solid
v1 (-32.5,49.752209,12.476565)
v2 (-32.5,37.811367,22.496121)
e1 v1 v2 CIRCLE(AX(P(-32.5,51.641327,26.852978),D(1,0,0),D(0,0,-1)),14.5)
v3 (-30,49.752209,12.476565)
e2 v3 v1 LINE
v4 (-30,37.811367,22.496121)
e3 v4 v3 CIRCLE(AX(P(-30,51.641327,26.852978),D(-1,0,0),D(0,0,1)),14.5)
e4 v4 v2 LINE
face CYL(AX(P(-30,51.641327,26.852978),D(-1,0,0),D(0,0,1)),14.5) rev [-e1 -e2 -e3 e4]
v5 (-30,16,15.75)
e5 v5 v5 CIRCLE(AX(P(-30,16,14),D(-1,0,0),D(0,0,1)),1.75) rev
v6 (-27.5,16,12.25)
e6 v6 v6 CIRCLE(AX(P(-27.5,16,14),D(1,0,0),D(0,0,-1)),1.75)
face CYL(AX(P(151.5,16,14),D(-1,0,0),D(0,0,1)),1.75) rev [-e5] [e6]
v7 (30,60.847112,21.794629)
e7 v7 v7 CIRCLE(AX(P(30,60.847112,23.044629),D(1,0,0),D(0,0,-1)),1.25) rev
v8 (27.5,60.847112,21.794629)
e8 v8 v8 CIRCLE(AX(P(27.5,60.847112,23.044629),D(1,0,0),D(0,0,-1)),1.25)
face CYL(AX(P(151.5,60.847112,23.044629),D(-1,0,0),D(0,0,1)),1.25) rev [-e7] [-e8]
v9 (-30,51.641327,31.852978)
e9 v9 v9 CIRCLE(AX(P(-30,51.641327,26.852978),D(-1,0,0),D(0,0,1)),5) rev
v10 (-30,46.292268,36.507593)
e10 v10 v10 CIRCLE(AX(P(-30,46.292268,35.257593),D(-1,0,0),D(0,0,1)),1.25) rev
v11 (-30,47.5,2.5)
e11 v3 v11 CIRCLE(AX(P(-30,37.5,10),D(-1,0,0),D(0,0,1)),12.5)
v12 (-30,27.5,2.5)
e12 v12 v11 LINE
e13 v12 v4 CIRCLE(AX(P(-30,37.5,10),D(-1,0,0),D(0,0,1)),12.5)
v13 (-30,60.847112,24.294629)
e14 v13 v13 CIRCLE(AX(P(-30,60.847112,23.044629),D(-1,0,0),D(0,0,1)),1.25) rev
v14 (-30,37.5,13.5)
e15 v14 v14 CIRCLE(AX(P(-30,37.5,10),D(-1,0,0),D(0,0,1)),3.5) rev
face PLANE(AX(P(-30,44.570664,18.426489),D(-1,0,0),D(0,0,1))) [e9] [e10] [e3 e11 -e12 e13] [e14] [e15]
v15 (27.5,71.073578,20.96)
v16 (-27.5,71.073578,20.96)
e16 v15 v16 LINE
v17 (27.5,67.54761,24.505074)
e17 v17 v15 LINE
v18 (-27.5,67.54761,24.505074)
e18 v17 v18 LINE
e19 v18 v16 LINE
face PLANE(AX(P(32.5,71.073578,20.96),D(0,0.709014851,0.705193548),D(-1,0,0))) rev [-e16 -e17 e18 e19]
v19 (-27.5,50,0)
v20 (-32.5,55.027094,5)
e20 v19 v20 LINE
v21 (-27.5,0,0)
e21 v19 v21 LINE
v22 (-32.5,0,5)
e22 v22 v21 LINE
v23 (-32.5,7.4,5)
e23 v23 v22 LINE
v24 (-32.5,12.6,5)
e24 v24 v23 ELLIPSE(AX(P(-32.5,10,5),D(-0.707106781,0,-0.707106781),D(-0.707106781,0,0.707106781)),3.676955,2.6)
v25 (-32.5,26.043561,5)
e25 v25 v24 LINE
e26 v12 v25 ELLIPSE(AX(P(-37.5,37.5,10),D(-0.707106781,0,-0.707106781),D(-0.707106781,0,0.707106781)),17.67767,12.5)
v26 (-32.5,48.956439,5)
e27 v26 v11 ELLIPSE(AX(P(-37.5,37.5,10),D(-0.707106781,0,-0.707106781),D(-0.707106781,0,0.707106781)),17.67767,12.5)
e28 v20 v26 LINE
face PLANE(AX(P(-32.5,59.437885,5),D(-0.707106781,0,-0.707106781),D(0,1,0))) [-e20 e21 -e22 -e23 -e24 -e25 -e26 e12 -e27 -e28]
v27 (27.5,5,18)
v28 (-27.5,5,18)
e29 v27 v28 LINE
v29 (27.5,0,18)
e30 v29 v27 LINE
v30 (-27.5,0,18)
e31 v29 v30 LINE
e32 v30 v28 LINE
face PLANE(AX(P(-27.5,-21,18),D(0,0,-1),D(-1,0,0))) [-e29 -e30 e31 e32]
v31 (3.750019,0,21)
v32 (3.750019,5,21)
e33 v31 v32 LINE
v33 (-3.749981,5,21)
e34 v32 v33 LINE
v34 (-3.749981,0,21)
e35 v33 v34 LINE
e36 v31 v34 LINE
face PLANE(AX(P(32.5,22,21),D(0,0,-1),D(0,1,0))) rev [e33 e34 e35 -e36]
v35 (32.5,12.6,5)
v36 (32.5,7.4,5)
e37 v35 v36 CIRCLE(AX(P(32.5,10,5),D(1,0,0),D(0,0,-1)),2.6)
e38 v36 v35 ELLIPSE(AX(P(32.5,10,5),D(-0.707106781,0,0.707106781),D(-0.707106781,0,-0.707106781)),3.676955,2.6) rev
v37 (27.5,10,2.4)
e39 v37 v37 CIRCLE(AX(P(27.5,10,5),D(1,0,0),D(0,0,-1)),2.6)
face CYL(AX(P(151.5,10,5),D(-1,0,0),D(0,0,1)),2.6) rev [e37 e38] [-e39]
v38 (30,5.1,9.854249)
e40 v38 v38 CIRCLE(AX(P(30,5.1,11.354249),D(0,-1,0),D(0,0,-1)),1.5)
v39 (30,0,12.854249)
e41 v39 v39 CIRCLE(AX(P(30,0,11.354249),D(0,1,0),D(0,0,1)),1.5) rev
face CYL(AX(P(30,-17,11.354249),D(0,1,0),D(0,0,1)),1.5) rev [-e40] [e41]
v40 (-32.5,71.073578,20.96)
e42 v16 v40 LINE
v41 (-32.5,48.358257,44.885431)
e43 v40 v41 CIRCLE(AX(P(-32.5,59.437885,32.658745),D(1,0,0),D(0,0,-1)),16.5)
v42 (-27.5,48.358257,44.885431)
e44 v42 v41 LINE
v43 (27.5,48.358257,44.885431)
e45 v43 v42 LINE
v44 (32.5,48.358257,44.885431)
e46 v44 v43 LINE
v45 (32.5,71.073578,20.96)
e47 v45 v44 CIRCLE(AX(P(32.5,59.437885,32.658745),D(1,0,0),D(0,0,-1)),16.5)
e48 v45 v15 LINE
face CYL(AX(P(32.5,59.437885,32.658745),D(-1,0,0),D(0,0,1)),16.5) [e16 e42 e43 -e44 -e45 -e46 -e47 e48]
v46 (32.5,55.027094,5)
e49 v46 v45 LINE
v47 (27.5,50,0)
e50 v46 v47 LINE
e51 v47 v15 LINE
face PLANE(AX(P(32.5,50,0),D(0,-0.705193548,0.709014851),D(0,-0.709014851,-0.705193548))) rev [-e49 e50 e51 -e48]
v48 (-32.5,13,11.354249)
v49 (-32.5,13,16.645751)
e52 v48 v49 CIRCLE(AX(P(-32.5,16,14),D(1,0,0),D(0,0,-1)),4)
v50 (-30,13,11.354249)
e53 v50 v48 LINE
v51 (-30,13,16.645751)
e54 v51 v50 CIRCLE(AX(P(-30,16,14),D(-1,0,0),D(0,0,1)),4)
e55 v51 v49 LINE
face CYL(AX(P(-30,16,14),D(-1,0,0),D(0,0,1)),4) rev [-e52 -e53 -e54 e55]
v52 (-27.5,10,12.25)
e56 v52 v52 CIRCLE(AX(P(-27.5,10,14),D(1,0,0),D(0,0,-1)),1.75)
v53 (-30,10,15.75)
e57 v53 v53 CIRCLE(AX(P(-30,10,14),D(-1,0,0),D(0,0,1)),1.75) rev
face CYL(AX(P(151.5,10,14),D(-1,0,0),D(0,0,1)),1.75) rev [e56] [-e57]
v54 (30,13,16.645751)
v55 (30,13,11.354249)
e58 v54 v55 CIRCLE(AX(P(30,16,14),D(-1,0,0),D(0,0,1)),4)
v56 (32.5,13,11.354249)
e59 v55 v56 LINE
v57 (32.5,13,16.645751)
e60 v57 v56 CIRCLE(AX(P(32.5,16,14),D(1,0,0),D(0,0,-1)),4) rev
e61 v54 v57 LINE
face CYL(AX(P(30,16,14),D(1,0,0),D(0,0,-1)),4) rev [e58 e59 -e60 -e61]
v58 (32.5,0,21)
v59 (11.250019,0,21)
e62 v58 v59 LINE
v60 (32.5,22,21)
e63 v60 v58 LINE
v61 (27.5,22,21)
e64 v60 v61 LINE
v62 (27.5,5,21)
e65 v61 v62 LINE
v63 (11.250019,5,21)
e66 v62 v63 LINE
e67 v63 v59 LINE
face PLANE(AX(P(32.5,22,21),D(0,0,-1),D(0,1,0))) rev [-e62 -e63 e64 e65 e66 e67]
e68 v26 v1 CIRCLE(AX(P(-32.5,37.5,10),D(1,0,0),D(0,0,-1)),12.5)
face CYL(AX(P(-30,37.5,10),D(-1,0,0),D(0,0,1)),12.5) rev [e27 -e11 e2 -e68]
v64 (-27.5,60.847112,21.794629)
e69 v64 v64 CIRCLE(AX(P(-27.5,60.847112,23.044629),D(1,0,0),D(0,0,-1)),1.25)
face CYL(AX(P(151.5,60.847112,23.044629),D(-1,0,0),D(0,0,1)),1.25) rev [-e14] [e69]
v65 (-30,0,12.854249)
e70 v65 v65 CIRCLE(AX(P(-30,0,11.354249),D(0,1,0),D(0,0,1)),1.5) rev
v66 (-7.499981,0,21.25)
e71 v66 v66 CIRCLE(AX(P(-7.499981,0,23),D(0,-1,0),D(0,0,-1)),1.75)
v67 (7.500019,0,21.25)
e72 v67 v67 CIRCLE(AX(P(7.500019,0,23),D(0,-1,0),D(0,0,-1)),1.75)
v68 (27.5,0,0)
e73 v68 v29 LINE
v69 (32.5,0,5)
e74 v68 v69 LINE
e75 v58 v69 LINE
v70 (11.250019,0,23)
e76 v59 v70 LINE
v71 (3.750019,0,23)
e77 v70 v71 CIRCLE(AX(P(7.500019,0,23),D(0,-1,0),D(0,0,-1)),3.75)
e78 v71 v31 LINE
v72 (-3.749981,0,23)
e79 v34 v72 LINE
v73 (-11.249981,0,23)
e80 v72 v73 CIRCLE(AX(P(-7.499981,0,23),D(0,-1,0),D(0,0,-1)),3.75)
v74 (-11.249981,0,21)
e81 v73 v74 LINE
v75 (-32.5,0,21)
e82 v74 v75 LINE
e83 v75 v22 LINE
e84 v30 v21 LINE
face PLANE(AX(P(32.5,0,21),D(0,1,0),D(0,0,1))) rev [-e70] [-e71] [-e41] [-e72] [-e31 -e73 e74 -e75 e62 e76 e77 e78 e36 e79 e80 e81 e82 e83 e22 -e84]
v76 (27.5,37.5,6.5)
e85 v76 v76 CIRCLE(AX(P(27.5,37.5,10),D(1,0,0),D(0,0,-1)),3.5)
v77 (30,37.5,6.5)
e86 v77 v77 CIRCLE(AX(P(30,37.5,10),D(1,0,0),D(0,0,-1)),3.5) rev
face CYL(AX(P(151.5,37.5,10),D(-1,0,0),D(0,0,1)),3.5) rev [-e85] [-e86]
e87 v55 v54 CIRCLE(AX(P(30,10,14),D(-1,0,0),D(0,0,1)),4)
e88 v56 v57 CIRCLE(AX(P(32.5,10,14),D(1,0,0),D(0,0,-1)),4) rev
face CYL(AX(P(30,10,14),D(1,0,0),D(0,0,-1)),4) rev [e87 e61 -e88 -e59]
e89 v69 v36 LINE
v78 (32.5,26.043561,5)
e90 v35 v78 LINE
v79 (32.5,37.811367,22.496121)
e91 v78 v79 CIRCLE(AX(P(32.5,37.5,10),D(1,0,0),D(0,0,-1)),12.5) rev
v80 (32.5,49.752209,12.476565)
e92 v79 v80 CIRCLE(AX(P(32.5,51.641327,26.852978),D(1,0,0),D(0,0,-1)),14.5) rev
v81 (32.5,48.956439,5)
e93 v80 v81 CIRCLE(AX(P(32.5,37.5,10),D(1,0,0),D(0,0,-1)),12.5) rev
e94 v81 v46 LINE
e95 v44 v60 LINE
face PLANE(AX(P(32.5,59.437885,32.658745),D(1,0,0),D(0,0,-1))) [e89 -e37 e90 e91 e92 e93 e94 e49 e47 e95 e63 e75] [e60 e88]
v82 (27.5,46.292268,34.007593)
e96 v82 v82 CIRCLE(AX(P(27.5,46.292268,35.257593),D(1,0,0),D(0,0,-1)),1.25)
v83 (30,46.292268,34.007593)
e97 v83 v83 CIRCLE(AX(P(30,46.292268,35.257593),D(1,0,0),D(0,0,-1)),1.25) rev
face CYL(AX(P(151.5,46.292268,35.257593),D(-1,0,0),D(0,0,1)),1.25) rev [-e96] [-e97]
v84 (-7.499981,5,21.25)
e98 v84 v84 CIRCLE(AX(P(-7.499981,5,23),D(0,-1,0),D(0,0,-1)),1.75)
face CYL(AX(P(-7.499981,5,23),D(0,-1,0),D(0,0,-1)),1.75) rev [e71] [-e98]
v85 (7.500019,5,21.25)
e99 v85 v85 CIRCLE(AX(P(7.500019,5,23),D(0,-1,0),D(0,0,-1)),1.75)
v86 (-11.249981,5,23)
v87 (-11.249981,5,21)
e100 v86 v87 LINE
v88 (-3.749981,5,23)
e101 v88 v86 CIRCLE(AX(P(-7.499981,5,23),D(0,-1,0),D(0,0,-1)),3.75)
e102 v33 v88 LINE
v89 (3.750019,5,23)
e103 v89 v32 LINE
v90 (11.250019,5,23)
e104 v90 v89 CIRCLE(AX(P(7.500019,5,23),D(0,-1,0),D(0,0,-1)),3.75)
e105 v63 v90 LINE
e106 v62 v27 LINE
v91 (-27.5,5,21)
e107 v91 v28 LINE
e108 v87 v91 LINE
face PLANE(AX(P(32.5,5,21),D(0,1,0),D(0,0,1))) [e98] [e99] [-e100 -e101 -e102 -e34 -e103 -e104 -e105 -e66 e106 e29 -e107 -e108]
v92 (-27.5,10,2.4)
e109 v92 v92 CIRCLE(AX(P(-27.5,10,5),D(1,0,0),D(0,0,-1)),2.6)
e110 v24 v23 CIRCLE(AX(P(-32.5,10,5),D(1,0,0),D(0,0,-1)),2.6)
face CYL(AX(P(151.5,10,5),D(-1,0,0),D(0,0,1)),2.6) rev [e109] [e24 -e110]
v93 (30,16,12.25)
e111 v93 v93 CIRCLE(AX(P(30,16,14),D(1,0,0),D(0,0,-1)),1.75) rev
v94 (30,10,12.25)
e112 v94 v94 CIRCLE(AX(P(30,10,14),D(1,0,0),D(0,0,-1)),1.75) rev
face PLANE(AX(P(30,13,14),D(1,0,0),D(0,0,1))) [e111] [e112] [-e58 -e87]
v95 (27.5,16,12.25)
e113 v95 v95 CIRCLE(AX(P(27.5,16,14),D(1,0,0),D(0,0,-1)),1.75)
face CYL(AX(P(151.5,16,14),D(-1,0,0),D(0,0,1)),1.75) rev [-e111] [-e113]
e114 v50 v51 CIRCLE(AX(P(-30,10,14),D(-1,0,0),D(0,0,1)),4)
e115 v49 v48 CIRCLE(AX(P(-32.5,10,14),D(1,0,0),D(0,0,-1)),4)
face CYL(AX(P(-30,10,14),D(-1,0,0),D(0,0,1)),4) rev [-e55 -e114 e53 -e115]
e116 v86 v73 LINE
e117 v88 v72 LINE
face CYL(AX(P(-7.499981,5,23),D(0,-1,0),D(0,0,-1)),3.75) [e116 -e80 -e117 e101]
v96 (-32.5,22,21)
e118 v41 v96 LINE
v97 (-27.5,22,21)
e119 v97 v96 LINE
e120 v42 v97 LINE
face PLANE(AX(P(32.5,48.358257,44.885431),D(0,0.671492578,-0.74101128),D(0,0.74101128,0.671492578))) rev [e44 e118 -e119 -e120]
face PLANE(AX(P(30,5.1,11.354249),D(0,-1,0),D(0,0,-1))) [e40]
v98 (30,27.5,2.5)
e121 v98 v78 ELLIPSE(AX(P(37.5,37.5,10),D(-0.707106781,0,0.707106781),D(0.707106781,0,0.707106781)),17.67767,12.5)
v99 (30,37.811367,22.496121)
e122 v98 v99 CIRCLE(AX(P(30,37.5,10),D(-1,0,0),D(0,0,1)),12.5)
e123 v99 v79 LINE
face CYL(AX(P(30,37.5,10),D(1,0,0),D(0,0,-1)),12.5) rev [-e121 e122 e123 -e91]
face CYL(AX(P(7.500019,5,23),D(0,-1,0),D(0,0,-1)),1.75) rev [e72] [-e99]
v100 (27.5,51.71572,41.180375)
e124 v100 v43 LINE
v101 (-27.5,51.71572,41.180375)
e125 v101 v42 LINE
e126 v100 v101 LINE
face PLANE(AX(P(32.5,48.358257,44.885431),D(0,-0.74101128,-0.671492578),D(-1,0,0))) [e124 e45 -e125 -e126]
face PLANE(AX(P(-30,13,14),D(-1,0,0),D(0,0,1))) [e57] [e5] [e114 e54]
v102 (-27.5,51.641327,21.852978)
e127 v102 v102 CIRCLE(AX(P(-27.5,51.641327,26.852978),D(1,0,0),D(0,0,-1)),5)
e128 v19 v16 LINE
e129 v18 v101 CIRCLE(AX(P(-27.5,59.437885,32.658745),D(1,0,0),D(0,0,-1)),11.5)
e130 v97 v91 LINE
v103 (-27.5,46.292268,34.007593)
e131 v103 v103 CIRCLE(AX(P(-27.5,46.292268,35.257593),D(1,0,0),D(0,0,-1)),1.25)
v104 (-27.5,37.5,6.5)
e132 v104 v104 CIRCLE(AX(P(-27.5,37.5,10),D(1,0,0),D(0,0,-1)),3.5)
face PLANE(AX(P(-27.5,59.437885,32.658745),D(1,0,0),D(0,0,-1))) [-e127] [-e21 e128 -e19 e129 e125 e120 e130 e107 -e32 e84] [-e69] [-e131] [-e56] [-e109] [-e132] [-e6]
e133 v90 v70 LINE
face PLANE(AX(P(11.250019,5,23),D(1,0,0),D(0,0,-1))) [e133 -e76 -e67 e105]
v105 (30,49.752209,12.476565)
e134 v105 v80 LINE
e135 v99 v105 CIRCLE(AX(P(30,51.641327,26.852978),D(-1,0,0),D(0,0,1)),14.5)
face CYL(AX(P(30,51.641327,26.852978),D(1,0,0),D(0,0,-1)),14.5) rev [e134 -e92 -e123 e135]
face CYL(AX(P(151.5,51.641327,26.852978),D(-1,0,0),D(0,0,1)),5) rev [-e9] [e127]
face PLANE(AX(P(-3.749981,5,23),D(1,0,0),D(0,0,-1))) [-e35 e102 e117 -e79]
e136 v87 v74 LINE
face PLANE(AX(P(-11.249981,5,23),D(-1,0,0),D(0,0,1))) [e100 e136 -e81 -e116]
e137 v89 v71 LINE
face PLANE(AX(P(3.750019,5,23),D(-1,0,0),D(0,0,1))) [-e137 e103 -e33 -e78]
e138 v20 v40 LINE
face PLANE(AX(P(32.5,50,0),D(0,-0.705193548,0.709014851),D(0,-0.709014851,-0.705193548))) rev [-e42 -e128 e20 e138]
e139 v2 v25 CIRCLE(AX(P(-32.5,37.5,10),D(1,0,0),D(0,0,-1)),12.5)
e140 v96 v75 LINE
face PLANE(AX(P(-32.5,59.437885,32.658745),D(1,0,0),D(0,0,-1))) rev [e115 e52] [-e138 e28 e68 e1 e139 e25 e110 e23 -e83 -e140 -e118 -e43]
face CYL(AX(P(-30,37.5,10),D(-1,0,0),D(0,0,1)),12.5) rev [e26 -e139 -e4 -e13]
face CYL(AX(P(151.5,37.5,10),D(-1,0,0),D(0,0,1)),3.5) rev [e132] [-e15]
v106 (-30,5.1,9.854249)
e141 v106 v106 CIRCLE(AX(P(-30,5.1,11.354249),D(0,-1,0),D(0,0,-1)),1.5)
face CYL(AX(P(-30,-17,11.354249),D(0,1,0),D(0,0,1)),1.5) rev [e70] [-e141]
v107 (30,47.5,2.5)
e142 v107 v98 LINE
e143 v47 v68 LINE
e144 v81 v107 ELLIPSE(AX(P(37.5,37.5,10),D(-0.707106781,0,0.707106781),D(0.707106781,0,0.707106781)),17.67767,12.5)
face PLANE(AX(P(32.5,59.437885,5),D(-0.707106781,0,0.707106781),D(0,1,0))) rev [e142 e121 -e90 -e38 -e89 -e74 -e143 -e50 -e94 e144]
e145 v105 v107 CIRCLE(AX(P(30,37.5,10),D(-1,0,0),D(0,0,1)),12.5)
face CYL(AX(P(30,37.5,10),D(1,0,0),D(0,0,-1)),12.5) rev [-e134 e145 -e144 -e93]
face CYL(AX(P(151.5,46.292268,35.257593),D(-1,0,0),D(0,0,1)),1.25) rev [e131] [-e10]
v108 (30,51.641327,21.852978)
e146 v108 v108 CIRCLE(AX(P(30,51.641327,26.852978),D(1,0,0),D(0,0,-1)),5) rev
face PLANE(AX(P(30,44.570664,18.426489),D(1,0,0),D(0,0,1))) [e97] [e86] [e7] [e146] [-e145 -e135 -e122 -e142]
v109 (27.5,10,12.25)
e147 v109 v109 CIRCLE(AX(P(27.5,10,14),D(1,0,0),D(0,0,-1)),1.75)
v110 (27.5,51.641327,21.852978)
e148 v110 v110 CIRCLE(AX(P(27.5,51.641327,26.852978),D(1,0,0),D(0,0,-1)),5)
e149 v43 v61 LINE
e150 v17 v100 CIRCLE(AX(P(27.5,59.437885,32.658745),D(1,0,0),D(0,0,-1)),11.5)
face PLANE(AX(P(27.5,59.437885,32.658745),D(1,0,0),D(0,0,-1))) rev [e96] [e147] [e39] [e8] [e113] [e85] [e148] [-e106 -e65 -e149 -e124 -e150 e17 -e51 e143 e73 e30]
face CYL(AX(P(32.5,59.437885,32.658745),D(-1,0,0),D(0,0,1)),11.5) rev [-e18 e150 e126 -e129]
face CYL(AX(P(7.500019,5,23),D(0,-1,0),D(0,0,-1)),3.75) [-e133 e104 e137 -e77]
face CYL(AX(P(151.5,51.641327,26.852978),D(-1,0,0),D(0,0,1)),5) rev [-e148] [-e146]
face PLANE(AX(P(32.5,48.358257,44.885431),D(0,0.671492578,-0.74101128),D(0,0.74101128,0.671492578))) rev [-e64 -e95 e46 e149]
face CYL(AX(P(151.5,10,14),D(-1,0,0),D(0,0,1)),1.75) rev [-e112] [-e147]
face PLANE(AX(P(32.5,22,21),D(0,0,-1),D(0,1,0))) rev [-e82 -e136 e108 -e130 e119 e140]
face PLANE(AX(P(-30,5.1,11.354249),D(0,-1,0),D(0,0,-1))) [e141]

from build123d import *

# Parameters (mm, degrees)
BOSS_EXTRUDE1_DEPTH     = 32.5
SHELL4_START            = -27.5
SHELL4_DEPTH            = 55
CUT_EXTRUDE2_DEPTH      = 21
CUT_EXTRUDE2_DEPTH_BACK = 20
SKETCH4_W               = 55
SKETCH4_H               = 18
CHAMFER18_START         = -24
CHAMFER18_OUTLINE_W     = 10
CHAMFER18_OUTLINE_H     = 57
CHAMFER18_DEPTH         = 4.554563517
CHAMFER36_START         = 19.445436483
CHAMFER36_OUTLINE_W     = 10
CHAMFER36_OUTLINE_H     = 57
CHAMFER36_DEPTH         = 4.554563517
SKETCH8_R               = 2.6
SKETCH8_R_2             = 1.75
SKETCH8_R_3             = 5
SKETCH8_R_4             = 3.5
SKETCH8_R_5             = 1.25
CUT_EXTRUDE4_DEPTH      = 185
CUT_EXTRUDE6_DEPTH      = 4.5
CUT_EXTRUDE8_DEPTH      = 17
CUT_EXTRUDE8_DEPTH_BACK = 5.1
SKETCH13_R              = 1.5
SKETCH14_R              = 1.75
BOSS_EXTRUDE2_DEPTH     = 5


with BuildPart() as part:
    # Sketch3 → Boss-Extrude1 (new, symmetric)
    with BuildSketch(Plane(origin=(0, 0, 0), x_dir=(0, 0, -1), z_dir=(1, 0, 0))):
        with BuildLine():
            Line((0, 50), (-20.96, 71.073578053))
            ThreePointArc((-20.96, 71.073578053), (-44.01947273, 71.403830624), (-44.885431169, 48.358256964))
            Line((-44.885431169, 48.358256964), (-21, 22))
            Line((-21, 22), (-21, 0))
            Line((-21, 0), (0, 0))
            Line((0, 0), (0, 50))
        make_face()
    extrude(amount=BOSS_EXTRUDE1_DEPTH, both=True)

    # Shell4: read off the stored shape, not the designer's step
    # Shell4 outline → Shell4 (cut)
    with BuildSketch(Plane.YZ.offset(SHELL4_START)):
        with BuildLine():
            Line((51.715719855, 41.180374768), (48.358256964, 44.885431169))
            Line((48.358256964, 44.885431169), (22, 21))
            Line((22, 21), (5, 21))
            Line((5, 21), (5, 0))
            Line((5, 0), (50, 0))
            Line((50, 0), (71.073578053, 20.96))
            Line((71.073578053, 20.96), (67.547610311, 24.505074257))
            ThreePointArc((67.547610311, 24.505074257), (67.777786345, 40.576827978), (51.715719855, 41.180374768))
        make_face()
    extrude(amount=SHELL4_DEPTH, mode=Mode.SUBTRACT)

    # Sketch4 → Cut-Extrude2 (cut, two sides: drawn at the far end of the back side and taken through both)
    with BuildSketch(Plane.XZ.offset(-CUT_EXTRUDE2_DEPTH_BACK)):
        with Locations((0, 9)):
            Rectangle(SKETCH4_W, SKETCH4_H)
    extrude(amount=CUT_EXTRUDE2_DEPTH + CUT_EXTRUDE2_DEPTH_BACK, mode=Mode.SUBTRACT)

    # Chamfer18: read off the stored shape, not the designer's step
    # Chamfer18 outline → Chamfer18 (cut)
    with BuildSketch(Plane(origin=(0, 0, 0), x_dir=(0.707106781186548, 0, -0.707106781186547), z_dir=(0.707106781186547, 0, 0.707106781186548)).offset(CHAMFER18_START)):
        with Locations((-23, 28.5)):
            Rectangle(CHAMFER18_OUTLINE_W, CHAMFER18_OUTLINE_H)
    extrude(amount=CHAMFER18_DEPTH, mode=Mode.SUBTRACT)

    # Chamfer36: read off the stored shape, not the designer's step
    # Chamfer36 outline → Chamfer36 (cut)
    with BuildSketch(Plane(origin=(0, 0, 0), x_dir=(0.707106781186548, 0, 0.707106781186547), z_dir=(0.707106781186547, 0, -0.707106781186548)).offset(CHAMFER36_START)):
        with Locations((23, -28.5)):
            Rectangle(CHAMFER36_OUTLINE_W, CHAMFER36_OUTLINE_H)
    extrude(amount=CHAMFER36_DEPTH, mode=Mode.SUBTRACT)

    # Sketch8 → Cut-Extrude4 (cut)
    with BuildSketch(Plane.ZY.offset(33.5)):
        with Locations(Location((5, 10, 0), (0, 0, 270))):
            Circle(SKETCH8_R)
        with Locations(Location((14, 10, 0), (0, 0, 180))):
            Circle(SKETCH8_R_2)
        with Locations(Location((14, 16, 0), (0, 0, 180))):
            Circle(SKETCH8_R_2)
        with Locations(Location((26.852977749, 51.641327413, 0), (0, 0, 180))):
            Circle(SKETCH8_R_3)
        with Locations(Location((10, 37.5, 0), (0, 0, 180))):
            Circle(SKETCH8_R_4)
        with Locations(Location((35.25759337, 46.292268033, 0), (0, 0, 180))):
            Circle(SKETCH8_R_5)
        with Locations(Location((23.044628786, 60.847112452, 0), (0, 0, 180))):
            Circle(SKETCH8_R_5)
    extrude(amount=-CUT_EXTRUDE4_DEPTH, mode=Mode.SUBTRACT)

    # Sketch10 → Cut-Extrude6 (cut)
    with BuildSketch(Plane.ZY.offset(34.5)):
        with BuildLine():
            ThreePointArc((16.645751311, 13), (14, 20), (11.354248689, 13))
            ThreePointArc((11.354248689, 13), (14, 6), (16.645751311, 13))
        make_face()
        with BuildLine():
            ThreePointArc((12.476565423, 49.752208932), (0.424444461, 29.465154879), (22.49612142, 37.811367076))
            ThreePointArc((22.49612142, 37.811367076), (37.960622174, 60.961747754), (12.476565423, 49.752208932))
        make_face()
    cut_extrude6 = extrude(amount=-CUT_EXTRUDE6_DEPTH, mode=Mode.SUBTRACT)

    # Mirror1: Cut-Extrude6 across plane
    add(cut_extrude6.mirror(Plane(origin=(0, 0, 0), x_dir=(0, 0, 1), z_dir=(1, 0, 0))), mode=Mode.SUBTRACT)

    # Sketch13 → Cut-Extrude8 (cut, two sides: drawn at the far end of the back side and taken through both)
    with BuildSketch(Plane.XZ.offset(-CUT_EXTRUDE8_DEPTH_BACK)):
        with Locations(Location((-30, 11.354248689, 0), (0, 0, 90))):
            Circle(SKETCH13_R)
        with Locations(Location((30, 11.354248689, 0), (0, 0, 90))):
            Circle(SKETCH13_R)
    extrude(amount=CUT_EXTRUDE8_DEPTH + CUT_EXTRUDE8_DEPTH_BACK, mode=Mode.SUBTRACT)

    # Sketch14 → Boss-Extrude2 (add)
    # profile 1 of 2: a face of its own
    with BuildSketch(Plane.XZ):
        with BuildLine():
            Line((-3.749981176, 23), (-3.749981176, 21))
            Line((-3.749981176, 21), (-11.249981176, 21))
            Line((-11.249981176, 21), (-11.249981176, 23))
            ThreePointArc((-11.249981176, 23), (-7.499981176, 26.75), (-3.749981176, 23))
        make_face()
        with Locations(Location((-7.499981176, 23, 0), (0, 0, 270))):
            Circle(SKETCH14_R, mode=Mode.SUBTRACT)
    # profile 2 of 2: a face of its own
    with BuildSketch(Plane.XZ):
        with BuildLine():
            Line((3.750018824, 23), (3.750018824, 20.96))
            Line((3.750018824, 20.96), (11.250018824, 20.96))
            Line((11.250018824, 20.96), (11.250018824, 23))
            ThreePointArc((11.250018824, 23), (7.500018824, 26.75), (3.750018824, 23))
        make_face()
        with Locations(Location((7.500018824, 23, 0), (0, 0, 270))):
            Circle(SKETCH14_R, mode=Mode.SUBTRACT)
    extrude(amount=-BOSS_EXTRUDE2_DEPTH)


solid = part.part
